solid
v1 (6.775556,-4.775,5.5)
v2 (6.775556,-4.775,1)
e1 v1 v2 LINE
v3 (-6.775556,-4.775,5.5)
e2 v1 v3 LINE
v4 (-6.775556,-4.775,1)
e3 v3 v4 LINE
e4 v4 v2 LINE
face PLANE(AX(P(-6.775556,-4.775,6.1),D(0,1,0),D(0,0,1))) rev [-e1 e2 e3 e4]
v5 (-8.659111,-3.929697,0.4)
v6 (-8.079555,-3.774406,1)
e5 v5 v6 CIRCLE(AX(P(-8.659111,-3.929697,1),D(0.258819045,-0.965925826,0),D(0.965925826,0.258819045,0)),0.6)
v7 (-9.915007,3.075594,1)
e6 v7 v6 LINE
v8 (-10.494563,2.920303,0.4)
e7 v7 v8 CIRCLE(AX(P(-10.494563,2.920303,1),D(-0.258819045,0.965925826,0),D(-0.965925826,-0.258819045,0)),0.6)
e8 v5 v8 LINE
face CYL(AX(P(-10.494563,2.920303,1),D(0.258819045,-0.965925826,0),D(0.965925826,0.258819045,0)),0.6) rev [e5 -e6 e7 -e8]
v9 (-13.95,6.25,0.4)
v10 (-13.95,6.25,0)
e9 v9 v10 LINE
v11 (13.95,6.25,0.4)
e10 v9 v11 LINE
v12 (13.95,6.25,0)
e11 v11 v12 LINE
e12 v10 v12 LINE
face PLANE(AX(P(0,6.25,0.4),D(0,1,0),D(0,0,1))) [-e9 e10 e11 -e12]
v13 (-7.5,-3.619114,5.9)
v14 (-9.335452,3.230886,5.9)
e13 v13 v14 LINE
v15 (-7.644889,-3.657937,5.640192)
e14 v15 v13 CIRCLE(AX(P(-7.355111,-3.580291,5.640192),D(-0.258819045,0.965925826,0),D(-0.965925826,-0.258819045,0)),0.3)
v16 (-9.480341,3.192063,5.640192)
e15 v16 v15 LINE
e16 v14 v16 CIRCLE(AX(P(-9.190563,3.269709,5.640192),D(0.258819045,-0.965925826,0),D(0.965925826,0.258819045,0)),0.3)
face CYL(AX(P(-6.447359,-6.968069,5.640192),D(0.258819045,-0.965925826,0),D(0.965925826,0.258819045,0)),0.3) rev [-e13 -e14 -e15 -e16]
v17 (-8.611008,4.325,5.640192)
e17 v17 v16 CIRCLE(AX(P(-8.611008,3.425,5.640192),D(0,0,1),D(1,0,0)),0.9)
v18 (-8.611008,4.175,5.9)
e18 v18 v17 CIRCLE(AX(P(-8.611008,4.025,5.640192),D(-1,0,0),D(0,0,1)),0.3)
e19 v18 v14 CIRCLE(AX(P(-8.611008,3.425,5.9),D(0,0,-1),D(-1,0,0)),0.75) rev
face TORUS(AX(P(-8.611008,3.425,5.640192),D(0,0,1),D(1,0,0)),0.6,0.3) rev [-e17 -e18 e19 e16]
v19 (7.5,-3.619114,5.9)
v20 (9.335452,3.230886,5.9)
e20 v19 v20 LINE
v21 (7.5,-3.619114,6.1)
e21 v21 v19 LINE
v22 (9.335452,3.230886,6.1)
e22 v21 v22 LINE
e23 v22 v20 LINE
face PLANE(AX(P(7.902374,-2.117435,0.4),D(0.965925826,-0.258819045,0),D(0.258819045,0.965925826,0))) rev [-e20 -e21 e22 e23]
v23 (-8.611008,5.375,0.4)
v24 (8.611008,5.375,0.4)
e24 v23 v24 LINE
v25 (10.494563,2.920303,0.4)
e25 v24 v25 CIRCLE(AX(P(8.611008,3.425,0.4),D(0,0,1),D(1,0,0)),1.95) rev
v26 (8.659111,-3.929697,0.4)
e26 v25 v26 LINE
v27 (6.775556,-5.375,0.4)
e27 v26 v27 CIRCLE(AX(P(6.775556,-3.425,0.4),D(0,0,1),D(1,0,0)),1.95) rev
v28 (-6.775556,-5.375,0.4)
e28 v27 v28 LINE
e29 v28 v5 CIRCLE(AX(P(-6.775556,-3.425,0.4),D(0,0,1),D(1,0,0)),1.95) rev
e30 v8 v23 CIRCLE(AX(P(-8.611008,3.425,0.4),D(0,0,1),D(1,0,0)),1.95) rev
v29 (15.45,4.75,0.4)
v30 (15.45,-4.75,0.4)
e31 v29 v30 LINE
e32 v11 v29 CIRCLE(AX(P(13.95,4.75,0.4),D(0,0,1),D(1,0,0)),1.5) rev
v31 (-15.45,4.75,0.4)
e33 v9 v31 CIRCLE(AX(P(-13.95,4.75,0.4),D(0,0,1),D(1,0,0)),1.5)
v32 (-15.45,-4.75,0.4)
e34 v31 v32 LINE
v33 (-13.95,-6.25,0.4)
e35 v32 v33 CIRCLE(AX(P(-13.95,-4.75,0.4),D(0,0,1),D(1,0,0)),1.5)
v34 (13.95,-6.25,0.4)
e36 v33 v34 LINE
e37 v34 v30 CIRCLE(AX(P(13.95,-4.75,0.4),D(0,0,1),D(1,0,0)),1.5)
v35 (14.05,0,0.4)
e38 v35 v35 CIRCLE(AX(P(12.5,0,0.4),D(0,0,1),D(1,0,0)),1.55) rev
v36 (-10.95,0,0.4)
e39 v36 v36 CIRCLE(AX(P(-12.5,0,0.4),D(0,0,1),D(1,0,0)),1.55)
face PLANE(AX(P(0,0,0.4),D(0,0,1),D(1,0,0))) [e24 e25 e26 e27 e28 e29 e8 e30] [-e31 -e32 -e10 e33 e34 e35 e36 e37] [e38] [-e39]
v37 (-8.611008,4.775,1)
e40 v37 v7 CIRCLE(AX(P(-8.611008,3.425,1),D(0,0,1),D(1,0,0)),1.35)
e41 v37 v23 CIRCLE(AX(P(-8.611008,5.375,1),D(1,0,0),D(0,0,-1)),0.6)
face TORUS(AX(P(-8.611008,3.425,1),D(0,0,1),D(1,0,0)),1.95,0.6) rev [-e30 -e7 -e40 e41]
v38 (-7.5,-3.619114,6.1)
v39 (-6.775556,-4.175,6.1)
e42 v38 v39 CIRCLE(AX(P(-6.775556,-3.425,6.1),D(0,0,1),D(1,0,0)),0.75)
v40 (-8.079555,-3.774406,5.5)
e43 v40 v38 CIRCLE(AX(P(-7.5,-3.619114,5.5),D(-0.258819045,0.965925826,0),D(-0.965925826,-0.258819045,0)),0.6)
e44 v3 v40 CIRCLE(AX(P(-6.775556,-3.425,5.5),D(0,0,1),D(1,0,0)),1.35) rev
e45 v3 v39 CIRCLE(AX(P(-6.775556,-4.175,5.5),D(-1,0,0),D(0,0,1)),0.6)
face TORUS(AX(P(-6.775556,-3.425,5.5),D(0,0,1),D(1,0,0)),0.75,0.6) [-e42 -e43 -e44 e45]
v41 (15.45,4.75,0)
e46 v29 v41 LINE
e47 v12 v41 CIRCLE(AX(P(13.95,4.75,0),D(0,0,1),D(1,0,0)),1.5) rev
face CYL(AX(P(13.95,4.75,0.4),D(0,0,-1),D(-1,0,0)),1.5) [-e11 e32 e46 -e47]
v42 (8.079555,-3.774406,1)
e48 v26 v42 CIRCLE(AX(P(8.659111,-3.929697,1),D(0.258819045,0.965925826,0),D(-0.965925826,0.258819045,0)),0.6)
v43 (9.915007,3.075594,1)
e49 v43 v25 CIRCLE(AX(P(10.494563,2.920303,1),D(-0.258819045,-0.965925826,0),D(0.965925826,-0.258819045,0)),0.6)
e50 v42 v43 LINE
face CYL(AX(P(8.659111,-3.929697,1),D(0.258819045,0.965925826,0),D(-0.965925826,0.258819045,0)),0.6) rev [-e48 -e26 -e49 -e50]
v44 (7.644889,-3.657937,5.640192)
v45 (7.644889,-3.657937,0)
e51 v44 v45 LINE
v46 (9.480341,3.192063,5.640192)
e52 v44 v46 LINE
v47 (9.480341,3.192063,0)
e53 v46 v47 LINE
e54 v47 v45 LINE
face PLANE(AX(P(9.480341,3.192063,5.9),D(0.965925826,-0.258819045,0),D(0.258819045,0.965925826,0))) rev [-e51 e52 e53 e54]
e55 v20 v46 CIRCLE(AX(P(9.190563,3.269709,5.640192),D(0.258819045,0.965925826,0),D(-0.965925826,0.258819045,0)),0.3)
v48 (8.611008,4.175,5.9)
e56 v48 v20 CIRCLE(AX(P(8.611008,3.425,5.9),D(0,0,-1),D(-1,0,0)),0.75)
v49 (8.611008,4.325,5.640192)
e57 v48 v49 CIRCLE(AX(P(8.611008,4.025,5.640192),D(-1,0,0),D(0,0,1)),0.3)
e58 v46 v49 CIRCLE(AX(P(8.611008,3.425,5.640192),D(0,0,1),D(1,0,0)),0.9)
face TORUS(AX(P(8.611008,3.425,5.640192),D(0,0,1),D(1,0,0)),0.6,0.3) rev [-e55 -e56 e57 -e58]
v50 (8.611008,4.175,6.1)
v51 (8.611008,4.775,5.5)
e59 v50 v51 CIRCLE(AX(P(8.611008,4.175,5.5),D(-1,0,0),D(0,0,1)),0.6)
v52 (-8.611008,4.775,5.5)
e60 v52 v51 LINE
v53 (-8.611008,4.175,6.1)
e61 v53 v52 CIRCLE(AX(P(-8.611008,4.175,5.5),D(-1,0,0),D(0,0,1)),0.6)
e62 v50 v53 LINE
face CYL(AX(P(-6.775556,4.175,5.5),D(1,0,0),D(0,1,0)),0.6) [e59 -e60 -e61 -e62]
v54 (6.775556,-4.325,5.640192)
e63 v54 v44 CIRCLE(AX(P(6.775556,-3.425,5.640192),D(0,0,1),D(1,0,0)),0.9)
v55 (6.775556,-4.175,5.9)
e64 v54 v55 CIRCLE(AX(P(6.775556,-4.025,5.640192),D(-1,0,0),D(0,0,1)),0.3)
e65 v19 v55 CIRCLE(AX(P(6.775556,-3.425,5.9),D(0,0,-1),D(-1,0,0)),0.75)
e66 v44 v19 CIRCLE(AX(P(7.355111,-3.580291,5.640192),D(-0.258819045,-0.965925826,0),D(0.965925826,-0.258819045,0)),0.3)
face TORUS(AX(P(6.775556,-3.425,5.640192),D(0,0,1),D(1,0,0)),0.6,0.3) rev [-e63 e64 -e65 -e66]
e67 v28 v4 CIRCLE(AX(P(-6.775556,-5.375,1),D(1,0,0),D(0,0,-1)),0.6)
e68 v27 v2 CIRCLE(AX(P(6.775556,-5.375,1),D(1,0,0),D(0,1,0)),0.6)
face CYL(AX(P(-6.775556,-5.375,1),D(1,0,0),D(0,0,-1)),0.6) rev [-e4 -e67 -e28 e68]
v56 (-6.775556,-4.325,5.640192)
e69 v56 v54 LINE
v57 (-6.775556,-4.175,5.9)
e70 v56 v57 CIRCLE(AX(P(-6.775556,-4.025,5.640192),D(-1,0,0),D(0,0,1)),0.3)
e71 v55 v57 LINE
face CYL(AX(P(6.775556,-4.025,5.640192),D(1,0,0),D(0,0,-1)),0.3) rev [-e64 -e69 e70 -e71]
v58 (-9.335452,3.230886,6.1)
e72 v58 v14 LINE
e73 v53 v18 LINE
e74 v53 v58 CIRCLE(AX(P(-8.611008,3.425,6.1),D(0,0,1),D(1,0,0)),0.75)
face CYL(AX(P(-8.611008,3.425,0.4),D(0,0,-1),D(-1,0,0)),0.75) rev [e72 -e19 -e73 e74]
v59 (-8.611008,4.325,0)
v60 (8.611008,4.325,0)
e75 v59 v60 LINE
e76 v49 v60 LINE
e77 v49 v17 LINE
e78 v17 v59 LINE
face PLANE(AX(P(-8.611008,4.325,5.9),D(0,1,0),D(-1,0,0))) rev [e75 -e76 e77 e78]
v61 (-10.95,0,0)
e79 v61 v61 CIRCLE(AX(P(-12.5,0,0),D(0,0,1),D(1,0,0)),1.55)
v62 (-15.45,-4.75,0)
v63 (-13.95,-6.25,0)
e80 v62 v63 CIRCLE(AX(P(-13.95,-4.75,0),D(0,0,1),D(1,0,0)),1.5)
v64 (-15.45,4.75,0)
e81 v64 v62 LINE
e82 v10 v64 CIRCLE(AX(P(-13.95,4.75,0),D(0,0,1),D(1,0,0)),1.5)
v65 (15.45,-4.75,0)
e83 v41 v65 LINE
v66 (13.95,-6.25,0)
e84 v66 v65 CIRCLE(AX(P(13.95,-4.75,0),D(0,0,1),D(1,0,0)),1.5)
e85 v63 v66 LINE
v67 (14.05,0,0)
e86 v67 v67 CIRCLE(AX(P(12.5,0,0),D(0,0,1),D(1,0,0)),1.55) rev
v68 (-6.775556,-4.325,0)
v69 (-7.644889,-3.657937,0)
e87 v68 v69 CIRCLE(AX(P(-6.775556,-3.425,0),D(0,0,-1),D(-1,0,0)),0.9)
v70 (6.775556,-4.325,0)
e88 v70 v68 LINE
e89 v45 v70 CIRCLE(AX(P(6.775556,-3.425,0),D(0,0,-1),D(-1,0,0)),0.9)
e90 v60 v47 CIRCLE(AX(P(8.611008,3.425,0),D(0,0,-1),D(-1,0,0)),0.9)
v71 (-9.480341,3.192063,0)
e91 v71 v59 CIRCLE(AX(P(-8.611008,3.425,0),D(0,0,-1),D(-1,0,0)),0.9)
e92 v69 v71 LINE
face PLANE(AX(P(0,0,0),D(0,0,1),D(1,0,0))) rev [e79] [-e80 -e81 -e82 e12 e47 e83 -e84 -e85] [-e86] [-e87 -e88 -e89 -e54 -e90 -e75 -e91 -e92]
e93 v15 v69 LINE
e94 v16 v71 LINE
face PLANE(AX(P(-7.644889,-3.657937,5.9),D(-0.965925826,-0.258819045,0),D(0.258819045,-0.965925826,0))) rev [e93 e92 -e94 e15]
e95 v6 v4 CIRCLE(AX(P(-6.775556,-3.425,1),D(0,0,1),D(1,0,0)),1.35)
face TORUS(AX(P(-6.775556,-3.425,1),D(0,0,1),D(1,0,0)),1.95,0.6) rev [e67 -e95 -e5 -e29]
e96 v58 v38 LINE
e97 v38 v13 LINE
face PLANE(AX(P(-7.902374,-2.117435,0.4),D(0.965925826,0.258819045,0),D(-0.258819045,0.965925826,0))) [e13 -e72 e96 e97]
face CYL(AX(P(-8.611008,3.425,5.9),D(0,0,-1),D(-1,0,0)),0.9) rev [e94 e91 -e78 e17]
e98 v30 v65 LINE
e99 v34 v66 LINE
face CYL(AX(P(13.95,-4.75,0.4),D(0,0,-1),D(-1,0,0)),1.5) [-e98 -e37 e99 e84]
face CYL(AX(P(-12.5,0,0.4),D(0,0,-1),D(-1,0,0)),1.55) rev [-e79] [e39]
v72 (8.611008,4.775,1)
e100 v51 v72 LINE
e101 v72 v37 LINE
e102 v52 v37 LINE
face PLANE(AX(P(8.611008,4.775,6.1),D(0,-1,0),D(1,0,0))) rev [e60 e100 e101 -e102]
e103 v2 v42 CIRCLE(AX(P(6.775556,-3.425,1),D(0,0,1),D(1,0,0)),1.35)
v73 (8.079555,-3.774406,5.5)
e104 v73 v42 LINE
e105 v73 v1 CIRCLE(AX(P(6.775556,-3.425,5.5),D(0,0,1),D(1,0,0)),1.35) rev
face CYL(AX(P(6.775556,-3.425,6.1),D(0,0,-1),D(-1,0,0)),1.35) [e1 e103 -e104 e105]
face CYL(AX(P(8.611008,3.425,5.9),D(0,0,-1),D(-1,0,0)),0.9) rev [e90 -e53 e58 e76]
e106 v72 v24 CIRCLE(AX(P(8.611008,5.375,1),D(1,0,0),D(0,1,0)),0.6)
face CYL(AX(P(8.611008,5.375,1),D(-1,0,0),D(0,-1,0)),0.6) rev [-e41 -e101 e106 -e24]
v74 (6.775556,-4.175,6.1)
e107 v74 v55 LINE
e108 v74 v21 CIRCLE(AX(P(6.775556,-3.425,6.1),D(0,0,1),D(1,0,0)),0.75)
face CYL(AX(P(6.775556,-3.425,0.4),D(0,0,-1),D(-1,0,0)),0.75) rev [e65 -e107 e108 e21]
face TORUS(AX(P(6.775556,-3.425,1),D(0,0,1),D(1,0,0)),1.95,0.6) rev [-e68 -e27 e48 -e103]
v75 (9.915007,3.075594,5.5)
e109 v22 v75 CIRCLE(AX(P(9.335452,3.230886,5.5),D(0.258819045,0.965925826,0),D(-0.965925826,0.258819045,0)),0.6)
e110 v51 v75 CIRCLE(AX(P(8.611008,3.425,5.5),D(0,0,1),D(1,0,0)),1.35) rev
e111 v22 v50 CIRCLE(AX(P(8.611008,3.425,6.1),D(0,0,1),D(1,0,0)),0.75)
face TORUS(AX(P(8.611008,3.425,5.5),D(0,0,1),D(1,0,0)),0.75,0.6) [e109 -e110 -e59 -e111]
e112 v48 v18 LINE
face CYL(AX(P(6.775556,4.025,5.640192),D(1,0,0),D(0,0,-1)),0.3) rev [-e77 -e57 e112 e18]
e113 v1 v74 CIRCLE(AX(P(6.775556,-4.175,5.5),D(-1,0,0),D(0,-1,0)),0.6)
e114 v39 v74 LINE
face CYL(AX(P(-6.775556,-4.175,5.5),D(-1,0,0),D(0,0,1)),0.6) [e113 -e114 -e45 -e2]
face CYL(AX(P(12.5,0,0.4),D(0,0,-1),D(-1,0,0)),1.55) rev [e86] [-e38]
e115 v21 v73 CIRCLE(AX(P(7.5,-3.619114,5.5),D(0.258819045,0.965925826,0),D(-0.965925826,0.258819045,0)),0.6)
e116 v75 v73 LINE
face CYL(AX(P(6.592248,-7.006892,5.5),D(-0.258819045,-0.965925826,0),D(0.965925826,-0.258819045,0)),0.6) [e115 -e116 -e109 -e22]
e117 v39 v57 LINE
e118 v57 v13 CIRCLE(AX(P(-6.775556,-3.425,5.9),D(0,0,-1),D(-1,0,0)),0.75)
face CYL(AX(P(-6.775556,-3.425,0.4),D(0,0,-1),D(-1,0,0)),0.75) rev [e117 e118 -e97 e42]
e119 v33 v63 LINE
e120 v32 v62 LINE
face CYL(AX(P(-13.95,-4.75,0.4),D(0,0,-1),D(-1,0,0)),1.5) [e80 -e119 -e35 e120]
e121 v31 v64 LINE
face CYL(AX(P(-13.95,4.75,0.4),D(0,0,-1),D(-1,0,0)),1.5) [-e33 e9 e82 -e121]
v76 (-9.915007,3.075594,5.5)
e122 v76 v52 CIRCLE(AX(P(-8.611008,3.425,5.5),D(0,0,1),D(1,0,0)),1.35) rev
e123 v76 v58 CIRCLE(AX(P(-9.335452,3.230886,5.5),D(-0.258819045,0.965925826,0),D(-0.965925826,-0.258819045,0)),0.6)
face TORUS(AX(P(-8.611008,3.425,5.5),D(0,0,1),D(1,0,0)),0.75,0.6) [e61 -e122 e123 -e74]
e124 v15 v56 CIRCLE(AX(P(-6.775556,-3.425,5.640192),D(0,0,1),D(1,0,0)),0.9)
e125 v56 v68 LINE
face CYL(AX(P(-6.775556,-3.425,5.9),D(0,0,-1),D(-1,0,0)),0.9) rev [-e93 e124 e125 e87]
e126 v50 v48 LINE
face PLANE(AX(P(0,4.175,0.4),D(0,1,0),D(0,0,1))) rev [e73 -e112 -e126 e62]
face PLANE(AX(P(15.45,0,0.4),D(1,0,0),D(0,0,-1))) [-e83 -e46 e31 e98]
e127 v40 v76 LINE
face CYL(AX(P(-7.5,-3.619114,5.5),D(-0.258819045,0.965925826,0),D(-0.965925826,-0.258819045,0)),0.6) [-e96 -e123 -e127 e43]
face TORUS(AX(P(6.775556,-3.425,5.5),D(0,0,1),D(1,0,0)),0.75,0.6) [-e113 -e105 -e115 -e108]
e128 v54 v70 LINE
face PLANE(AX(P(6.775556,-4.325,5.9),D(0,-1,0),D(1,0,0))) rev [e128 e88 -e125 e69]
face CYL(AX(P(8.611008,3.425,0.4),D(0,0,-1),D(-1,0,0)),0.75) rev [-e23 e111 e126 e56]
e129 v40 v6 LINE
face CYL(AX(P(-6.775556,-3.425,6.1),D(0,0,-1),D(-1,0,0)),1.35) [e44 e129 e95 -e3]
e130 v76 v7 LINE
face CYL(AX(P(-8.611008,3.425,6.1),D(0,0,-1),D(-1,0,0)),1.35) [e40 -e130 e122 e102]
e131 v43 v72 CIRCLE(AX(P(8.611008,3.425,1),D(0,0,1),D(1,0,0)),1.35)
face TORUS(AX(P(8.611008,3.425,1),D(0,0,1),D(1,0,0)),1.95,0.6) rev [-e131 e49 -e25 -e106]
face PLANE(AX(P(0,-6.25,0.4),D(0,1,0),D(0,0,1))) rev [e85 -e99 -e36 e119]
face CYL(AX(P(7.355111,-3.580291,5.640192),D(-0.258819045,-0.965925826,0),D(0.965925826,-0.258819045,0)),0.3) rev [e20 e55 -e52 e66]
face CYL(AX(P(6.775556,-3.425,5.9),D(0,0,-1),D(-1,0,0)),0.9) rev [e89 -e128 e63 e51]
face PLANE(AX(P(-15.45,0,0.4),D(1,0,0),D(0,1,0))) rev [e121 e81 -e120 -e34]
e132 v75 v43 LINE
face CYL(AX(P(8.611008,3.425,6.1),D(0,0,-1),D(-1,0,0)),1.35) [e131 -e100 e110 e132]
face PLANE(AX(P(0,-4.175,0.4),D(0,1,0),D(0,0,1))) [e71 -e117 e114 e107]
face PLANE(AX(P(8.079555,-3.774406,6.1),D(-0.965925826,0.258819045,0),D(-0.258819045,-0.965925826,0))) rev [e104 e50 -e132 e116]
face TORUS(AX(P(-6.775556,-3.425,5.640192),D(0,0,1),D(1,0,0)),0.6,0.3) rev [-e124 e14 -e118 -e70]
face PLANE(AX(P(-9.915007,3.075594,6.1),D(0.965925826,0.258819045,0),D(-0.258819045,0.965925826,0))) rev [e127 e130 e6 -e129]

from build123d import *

# Parameters (mm, degrees)
SKETCH1_R           = 1.55
BOSS_EXTRUDE1_DEPTH = 0.4
BOSS_EXTRUDE2_DEPTH = 5.7
FILLET1_R           = 0.6
CUT_EXTRUDE1_DEPTH  = 5.9
FILLET2_R           = 0.3


# Some blends are built 0.0001 mm under size
with BuildPart() as part:
    # Sketch1 → Boss-Extrude1 (new body)
    with BuildSketch(Plane.XY):
        with BuildLine():
            Line((-13.95, 6.25), (13.95, 6.25))
            ThreePointArc((13.95, 6.25), (15.010660172, 5.810660172), (15.45, 4.75))
            Line((15.45, 4.75), (15.45, -4.75))
            ThreePointArc((15.45, -4.75), (15.010660172, -5.810660172), (13.95, -6.25))
            Line((13.95, -6.25), (-13.95, -6.25))
            ThreePointArc((-13.95, -6.25), (-15.010660172, -5.810660172), (-15.45, -4.75))
            Line((-15.45, -4.75), (-15.45, 4.75))
            ThreePointArc((-15.45, 4.75), (-15.010660172, 5.810660172), (-13.95, 6.25))
        make_face()
        with Locations((-12.5, 0)):
            Circle(SKETCH1_R, mode=Mode.SUBTRACT)
        with Locations((12.5, 0)):
            Circle(SKETCH1_R, mode=Mode.SUBTRACT)
        with BuildLine():
            Line((-8.611007598, 4.175), (8.611007598, 4.175))
            ThreePointArc((8.611007598, 4.175), (9.206022604, 3.881571072), (9.335451968, 3.230885716))
            Line((9.335451968, 3.230885716), (7.5, -3.619114284))
            ThreePointArc((7.5, -3.619114284), (7.232126702, -4.020015005), (6.77555563, -4.175))
            Line((6.77555563, -4.175), (-6.77555563, -4.175))
            ThreePointArc((-6.77555563, -4.175), (-7.232126702, -4.020015005), (-7.5, -3.619114284))
            Line((-7.5, -3.619114284), (-9.335451968, 3.230885716))
            ThreePointArc((-9.335451968, 3.230885716), (-9.206022604, 3.881571072), (-8.611007598, 4.175))
        make_face(mode=Mode.SUBTRACT)
    extrude(amount=BOSS_EXTRUDE1_DEPTH)

    # Sketch2 → Boss-Extrude2 (add)
    with BuildSketch(Plane.XY.offset(0.4)):
        with BuildLine():
            Line((-6.77555563, -4.775), (6.77555563, -4.775))
            ThreePointArc((6.77555563, -4.775), (7.597383559, -4.496027009), (8.079555496, -3.774405711))
            Line((8.079555496, -3.774405711), (9.915007464, 3.075594289))
            ThreePointArc((9.915007464, 3.075594289), (9.682034608, 4.246827929), (8.611007598, 4.775))
            Line((8.611007598, 4.775), (-8.611007598, 4.775))
            ThreePointArc((-8.611007598, 4.775), (-9.682034608, 4.246827929), (-9.915007464, 3.075594289))
            Line((-9.915007464, 3.075594289), (-8.079555496, -3.774405711))
            ThreePointArc((-8.079555496, -3.774405711), (-7.597383559, -4.496027009), (-6.77555563, -4.775))
        make_face()
        with BuildLine():
            Line((-6.77555563, -4.175), (6.77555563, -4.175))
            ThreePointArc((6.77555563, -4.175), (7.232126702, -4.020015005), (7.5, -3.619114284))
            Line((7.5, -3.619114284), (9.335451968, 3.230885716))
            ThreePointArc((9.335451968, 3.230885716), (9.206022604, 3.881571072), (8.611007598, 4.175))
            Line((8.611007598, 4.175), (-8.611007598, 4.175))
            ThreePointArc((-8.611007598, 4.175), (-9.206022604, 3.881571072), (-9.335451968, 3.230885716))
            Line((-9.335451968, 3.230885716), (-7.5, -3.619114284))
            ThreePointArc((-7.5, -3.619114284), (-7.232126702, -4.020015005), (-6.77555563, -4.175))
        make_face(mode=Mode.SUBTRACT)
    extrude(amount=BOSS_EXTRUDE2_DEPTH)

    # Fillet1
    fillet1_edges = [part.edges().sort_by_distance(p)[0] for p in [
        (-7.597383559, -4.496027009, 6.1),
        (0, -4.775, 6.1),
        (7.597383559, -4.496027009, 6.1),
        (8.99728148, -0.349405711, 6.1),
        (9.682034608, 4.246827929, 6.1),
        (0, 4.775, 6.1),
        (-9.682034608, 4.246827929, 6.1),
        (-8.99728148, -0.349405711, 6.1),
        (-7.597383559, -4.496027009, 0.4),
        (0, -4.775, 0.4),
        (7.597383559, -4.496027009, 0.4),
        (8.99728148, -0.349405711, 0.4),
        (9.682034608, 4.246827929, 0.4),
        (0, 4.775, 0.4),
        (-9.682034608, 4.246827929, 0.4),
        (-8.99728148, -0.349405711, 0.4),
    ]]
    fillet(fillet1_edges, radius=FILLET1_R - 0.0001)  # a hair under: the kernel refuses the full size

    # Sketch3 → Cut-Extrude1 (cut)
    with BuildSketch(Plane(origin=(0, 0, 0), x_dir=(-1, 0, 0), z_dir=(0, 0, -1))):
        with BuildLine():
            Line((-6.77555563, -4.325), (6.77555563, -4.325))
            ThreePointArc((6.77555563, -4.325), (7.323440916, -4.139018006), (7.644888874, -3.657937141))
            Line((7.644888874, -3.657937141), (9.480340842, 3.192062859))
            ThreePointArc((9.480340842, 3.192062859), (9.325025605, 3.972885286), (8.611007598, 4.325))
            Line((8.611007598, 4.325), (-8.611007598, 4.325))
            ThreePointArc((-8.611007598, 4.325), (-9.325025605, 3.972885286), (-9.480340842, 3.192062859))
            Line((-9.480340842, 3.192062859), (-7.644888874, -3.657937141))
            ThreePointArc((-7.644888874, -3.657937141), (-7.323440916, -4.139018006), (-6.77555563, -4.325))
        make_face()
    extrude(amount=-CUT_EXTRUDE1_DEPTH, mode=Mode.SUBTRACT)

    # Fillet2
    # the kernel refuses this fillet: 0.3 mm, written as the material it adds along each edge
    with BuildSketch(Plane(origin=(6.77555563, -3.425, 5.9), x_dir=(0.9659258262890676, -0.2588190451025228, 0), z_dir=(0.2588190451025228, 0.9659258262890676, 0))) as fillet2_piece_1:
        with BuildLine():
            CenterArc((0.6, 0.259807621), FILLET2_R, 300, 60)
            Line((0.75, 0), (0.753, -0.005196152))
            ThreePointArc((0.753, -0.005196152), (0.825, -0.006), (0.9, -0.006))
            Line((0.9, -0.006), (0.906, 0))
            Line((0.906, 0), (0.906, 0.259807621))
            Line((0.906, 0.259807621), (0.9, 0.259807621))
        make_face()
    revolve(axis=Axis((6.77555563, -3.425, 5.9), (0, 0, -1)), revolution_arc=75)
    with BuildSketch(Plane(origin=(9.480340842, 3.192062859, 5.9), x_dir=(0, 0, -1), z_dir=(-0.25881904510252507, -0.9659258262890672, 0)), Plane(origin=(-7.644888874, -3.657937141, 5.9), x_dir=(0, 0, -1), z_dir=(-0.25881904510252135, 0.9659258262890682, 0))) as fillet2_piece_2:
        with BuildLine():
            CenterArc((0.259807621, -0.3), FILLET2_R, 90, 60)
            Line((0, -0.15), (-0.005196152, -0.147))
            ThreePointArc((-0.005196152, -0.147), (-0.006, -0.075), (-0.006, 0))
            Line((-0.006, 0), (0, 0.006))
            Line((0, 0.006), (0.259807621, 0.006))
            Line((0.259807621, 0.006), (0.259807621, 0))
        make_face()
    extrude(amount=7.091641836)
    with BuildSketch(Plane(origin=(8.611007598, 3.425, 5.9), x_dir=(0, 1, 0), z_dir=(-1, 0, 0))) as fillet2_piece_3:
        with BuildLine():
            CenterArc((0.6, 0.259807621), FILLET2_R, 300, 60)
            Line((0.75, 0), (0.753, -0.005196152))
            ThreePointArc((0.753, -0.005196152), (0.825, -0.006), (0.9, -0.006))
            Line((0.9, -0.006), (0.906, 0))
            Line((0.906, 0), (0.906, 0.259807621))
            Line((0.906, 0.259807621), (0.9, 0.259807621))
        make_face()
    revolve(axis=Axis((8.611007598, 3.425, 5.9), (0, 0, -1)), revolution_arc=105)
    with BuildSketch(Plane(origin=(-8.611007598, 4.325, 5.9), x_dir=(0, 0, -1), z_dir=(1, 0, 0))) as fillet2_piece_4:
        with BuildLine():
            CenterArc((0.259807621, -0.3), FILLET2_R, 90, 60)
            Line((0, -0.15), (-0.005196152, -0.147))
            ThreePointArc((-0.005196152, -0.147), (-0.006, -0.075), (-0.006, 0))
            Line((-0.006, 0), (0, 0.006))
            Line((0, 0.006), (0.259807621, 0.006))
            Line((0.259807621, 0.006), (0.259807621, 0))
        make_face()
    extrude(amount=17.222015197)
    with BuildSketch(Plane(origin=(-8.611007598, 3.425, 5.9), x_dir=(-0.9659258262890688, -0.25881904510251935, 0), z_dir=(0.25881904510251935, -0.9659258262890688, 0))) as fillet2_piece_5:
        with BuildLine():
            CenterArc((0.6, 0.259807621), FILLET2_R, 300, 60)
            Line((0.75, 0), (0.753, -0.005196152))
            ThreePointArc((0.753, -0.005196152), (0.825, -0.006), (0.9, -0.006))
            Line((0.9, -0.006), (0.906, 0))
            Line((0.906, 0), (0.906, 0.259807621))
            Line((0.906, 0.259807621), (0.9, 0.259807621))
        make_face()
    revolve(axis=Axis((-8.611007598, 3.425, 5.9), (0, 0, -1)), revolution_arc=105)
    with BuildSketch(Plane(origin=(-6.77555563, -3.425, 5.9), x_dir=(0, -1, 0), z_dir=(1, 0, 0))) as fillet2_piece_6:
        with BuildLine():
            CenterArc((0.6, 0.259807621), FILLET2_R, 300, 60)
            Line((0.75, 0), (0.753, -0.005196152))
            ThreePointArc((0.753, -0.005196152), (0.825, -0.006), (0.9, -0.006))
            Line((0.9, -0.006), (0.906, 0))
            Line((0.906, 0), (0.906, 0.259807621))
            Line((0.906, 0.259807621), (0.9, 0.259807621))
        make_face()
    revolve(axis=Axis((-6.77555563, -3.425, 5.9), (0, 0, -1)), revolution_arc=75)
    with BuildSketch(Plane(origin=(6.77555563, -4.325, 5.9), x_dir=(0, 0, -1), z_dir=(-1, 0, 0))) as fillet2_piece_7:
        with BuildLine():
            CenterArc((0.259807621, -0.3), FILLET2_R, 90, 60)
            Line((0, -0.15), (-0.005196152, -0.147))
            ThreePointArc((-0.005196152, -0.147), (-0.006, -0.075), (-0.006, 0))
            Line((-0.006, 0), (0, 0.006))
            Line((0, 0.006), (0.259807621, 0.006))
            Line((0.259807621, 0.006), (0.259807621, 0))
        make_face()
    extrude(amount=13.551111261)


solid = part.part
